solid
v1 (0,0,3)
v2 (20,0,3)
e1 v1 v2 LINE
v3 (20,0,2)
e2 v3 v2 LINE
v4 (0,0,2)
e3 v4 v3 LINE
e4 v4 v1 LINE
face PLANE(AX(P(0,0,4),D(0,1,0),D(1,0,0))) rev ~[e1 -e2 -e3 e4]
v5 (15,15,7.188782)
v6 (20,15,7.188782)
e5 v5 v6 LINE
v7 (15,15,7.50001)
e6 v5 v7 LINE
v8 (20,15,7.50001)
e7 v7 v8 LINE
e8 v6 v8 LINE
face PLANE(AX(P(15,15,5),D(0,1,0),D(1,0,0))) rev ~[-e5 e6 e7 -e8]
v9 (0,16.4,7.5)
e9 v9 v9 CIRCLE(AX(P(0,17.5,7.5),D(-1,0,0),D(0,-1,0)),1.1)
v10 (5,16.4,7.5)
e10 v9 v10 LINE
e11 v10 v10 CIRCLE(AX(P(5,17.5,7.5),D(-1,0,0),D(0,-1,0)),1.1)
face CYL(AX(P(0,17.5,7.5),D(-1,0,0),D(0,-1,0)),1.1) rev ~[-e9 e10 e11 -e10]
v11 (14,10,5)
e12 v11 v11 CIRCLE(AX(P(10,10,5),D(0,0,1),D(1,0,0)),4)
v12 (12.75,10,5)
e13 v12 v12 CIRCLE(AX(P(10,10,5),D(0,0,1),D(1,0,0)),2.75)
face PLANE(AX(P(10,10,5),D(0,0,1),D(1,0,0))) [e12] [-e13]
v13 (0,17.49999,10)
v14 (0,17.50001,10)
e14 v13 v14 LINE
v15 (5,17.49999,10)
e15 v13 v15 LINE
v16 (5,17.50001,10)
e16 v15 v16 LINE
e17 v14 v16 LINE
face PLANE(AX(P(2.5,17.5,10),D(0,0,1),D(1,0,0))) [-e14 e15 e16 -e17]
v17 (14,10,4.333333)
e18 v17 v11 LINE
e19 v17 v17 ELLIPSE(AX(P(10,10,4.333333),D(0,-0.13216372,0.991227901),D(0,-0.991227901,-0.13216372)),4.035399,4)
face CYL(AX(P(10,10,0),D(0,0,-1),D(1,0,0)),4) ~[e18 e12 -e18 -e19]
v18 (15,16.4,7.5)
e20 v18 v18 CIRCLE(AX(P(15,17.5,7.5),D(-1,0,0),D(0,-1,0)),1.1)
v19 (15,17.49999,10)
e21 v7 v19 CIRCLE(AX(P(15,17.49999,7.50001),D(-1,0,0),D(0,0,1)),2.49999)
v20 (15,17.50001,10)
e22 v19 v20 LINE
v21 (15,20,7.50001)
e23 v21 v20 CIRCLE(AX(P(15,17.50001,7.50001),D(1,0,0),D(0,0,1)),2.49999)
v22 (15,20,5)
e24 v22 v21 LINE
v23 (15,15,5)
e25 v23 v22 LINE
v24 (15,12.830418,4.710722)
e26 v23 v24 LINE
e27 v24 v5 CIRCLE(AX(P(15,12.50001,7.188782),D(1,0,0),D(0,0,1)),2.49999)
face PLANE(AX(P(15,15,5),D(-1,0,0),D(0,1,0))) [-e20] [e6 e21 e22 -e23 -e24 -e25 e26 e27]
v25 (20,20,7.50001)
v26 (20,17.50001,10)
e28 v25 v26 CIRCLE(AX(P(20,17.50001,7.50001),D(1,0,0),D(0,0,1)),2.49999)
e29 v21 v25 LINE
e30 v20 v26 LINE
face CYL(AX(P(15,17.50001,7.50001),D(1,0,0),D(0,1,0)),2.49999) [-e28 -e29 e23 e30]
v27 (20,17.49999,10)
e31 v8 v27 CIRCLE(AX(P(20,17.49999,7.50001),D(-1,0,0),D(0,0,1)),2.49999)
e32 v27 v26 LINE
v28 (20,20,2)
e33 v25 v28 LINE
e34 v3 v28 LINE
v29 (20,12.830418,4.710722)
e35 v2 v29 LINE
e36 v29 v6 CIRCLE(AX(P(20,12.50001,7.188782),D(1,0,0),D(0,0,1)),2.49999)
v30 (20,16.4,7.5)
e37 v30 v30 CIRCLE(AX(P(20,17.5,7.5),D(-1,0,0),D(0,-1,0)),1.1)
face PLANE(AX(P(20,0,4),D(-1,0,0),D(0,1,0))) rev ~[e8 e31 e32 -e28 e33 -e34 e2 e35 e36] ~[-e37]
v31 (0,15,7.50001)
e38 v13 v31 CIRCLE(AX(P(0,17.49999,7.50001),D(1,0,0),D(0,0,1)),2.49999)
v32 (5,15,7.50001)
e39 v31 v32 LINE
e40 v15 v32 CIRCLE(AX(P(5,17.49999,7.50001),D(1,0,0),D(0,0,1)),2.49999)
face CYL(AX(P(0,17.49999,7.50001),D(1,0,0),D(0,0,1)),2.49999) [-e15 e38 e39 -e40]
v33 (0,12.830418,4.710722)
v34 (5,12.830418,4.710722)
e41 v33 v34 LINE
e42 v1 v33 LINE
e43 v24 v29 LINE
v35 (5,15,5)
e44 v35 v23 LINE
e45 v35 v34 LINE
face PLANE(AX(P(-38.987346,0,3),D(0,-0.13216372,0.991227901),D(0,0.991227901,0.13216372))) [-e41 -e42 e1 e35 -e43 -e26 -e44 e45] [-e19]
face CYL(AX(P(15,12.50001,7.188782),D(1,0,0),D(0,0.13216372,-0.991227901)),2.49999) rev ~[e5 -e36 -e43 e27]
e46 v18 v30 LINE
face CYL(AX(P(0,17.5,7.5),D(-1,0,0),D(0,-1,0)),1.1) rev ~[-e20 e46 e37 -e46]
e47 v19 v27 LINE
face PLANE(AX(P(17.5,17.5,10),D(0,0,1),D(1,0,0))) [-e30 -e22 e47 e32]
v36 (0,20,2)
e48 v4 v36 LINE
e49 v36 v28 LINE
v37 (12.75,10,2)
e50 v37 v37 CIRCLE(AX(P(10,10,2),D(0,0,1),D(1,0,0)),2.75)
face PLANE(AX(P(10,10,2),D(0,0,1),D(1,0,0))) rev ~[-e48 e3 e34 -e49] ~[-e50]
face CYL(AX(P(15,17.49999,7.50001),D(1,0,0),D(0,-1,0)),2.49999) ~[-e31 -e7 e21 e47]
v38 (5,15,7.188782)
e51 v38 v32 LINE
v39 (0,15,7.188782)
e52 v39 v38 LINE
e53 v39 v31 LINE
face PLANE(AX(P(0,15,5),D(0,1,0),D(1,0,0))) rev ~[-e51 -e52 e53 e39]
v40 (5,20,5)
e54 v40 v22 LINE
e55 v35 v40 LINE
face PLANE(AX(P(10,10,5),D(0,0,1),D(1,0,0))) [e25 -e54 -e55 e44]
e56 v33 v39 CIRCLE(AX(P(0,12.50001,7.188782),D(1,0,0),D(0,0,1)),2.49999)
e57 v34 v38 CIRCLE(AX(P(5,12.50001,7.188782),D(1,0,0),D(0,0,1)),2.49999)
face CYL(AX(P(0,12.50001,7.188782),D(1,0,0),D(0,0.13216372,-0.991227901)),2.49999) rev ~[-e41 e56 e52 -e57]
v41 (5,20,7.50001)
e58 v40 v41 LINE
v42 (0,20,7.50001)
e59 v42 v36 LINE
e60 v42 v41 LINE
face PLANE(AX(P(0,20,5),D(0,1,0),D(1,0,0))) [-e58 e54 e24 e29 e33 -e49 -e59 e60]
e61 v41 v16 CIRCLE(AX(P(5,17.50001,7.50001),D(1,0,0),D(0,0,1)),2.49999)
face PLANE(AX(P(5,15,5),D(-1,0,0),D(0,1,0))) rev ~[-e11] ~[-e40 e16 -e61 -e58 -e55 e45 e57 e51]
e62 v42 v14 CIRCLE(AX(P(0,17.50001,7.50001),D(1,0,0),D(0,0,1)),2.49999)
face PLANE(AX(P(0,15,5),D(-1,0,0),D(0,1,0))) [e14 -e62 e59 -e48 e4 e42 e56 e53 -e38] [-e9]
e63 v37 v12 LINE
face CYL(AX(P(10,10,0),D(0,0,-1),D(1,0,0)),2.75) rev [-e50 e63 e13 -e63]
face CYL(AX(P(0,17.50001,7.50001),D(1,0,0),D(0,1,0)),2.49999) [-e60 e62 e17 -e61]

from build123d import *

# Parameters (mm, degrees)
F0_W        = 20
F0_H        = 20
F0_R        = 4
F1_DEPTH    = 4
F1_FACE_W   = 20
F1_FACE_H   = 20
F1_FACE_R   = 4
F0_R_2      = 2.75
F2_DEPTH    = 1
F3_W        = 5
F3_H        = 5
F4_DEPTH    = 5
F5_T1_DEPTH = 97.9746917615
F6_R        = 2.49999
F7_R        = 1.1
F8_DEPTH    = 25
F9_DEPTH    = 5
F10_DEPTH   = 2
F11_DEPTH   = 2


# Not quite as in the source:
# - a fillet or chamfer that OpenCascade refuses, or shapes differently, is made with other operations: its cross-section is extruded or revolved along the edge and cut away or added
# - a fillet or chamfer is up to 0.001 mm smaller than in the source, because OpenCascade refuses the exact size


with BuildPart() as f1:
    # F0 (on Top) → F1 (new body)
    with BuildSketch(Plane.XY):
        with Locations((10, 10)):
            Rectangle(F0_W, F0_H)
        with Locations((10, 10)):
            Circle(F0_R, mode=Mode.SUBTRACT)
    extrude(amount=F1_DEPTH)

    # F1_face (on face) + F0 (on Top) → F2 (join)
    with BuildSketch(Plane(origin=(10, 10, 4), x_dir=(1, 0, 0), z_dir=(0, 0, 1))):
        Rectangle(F1_FACE_W, F1_FACE_H)
        Circle(F1_FACE_R, mode=Mode.SUBTRACT)
    with BuildSketch(Plane.XY):
        with Locations((10, 10)):
            Circle(F0_R)
        with Locations((10, 10)):
            Circle(F0_R_2, mode=Mode.SUBTRACT)
    extrude(amount=F2_DEPTH)

    # F3 (on face) → F4 (join)
    with BuildSketch(Plane.XY.offset(5)):
        with Locations((2.5, 17.5)):
            Rectangle(F3_W, F3_H)
        with Locations((17.5, 17.5)):
            Rectangle(F3_W, F3_H)
    extrude(amount=F4_DEPTH)

    # F5: chamfer of 15 x 2 on 1 edges, made by hand

    # F5_s2 → F5_t1 (cut)
    with BuildSketch(Plane.YZ.offset(-38.9873458808)):
        Polygon((0, 3), (15, 5), (0, 5), align=None)
    extrude(amount=F5_T1_DEPTH, mode=Mode.SUBTRACT)

    # F6 (radius 2.5 in the source; OpenCascade refuses exactly that, so slightly less here)
    f6_edges = [f1.edges().sort_by_distance(p)[0] for p in [
        (2.5, 15, 5),
        (2.5, 15, 10),
        (17.5, 15, 5),
        (17.5, 15, 10),
        (2.5, 20, 10),
        (17.5, 20, 10),
    ]]
    fillet(f6_edges, radius=F6_R)

    # F7 (on face) → F8 (cut)
    with BuildSketch(Plane(origin=(0, 0, 0), x_dir=(0, -1, 0), z_dir=(-1, 0, 0))):
        with Locations((-17.5, 7.5)):
            Circle(F7_R)
    extrude(amount=-F8_DEPTH, mode=Mode.SUBTRACT)

    # F0 (on Top) → F9 (join)
    with BuildSketch(Plane.XY):
        with Locations((10, 10)):
            Circle(F0_R)
        with Locations((10, 10)):
            Circle(F0_R_2, mode=Mode.SUBTRACT)
    extrude(amount=F9_DEPTH)

    # F0 (on Top) → F10 (join)
    with BuildSketch(Plane.XY):
        with Locations((10, 10)):
            Circle(F0_R_2)
    extrude(amount=F10_DEPTH)

    # F0 (on Top) → F11 (cut)
    with BuildSketch(Plane.XY):
        with Locations((10, 10)):
            Rectangle(F0_W, F0_H)
        with Locations((10, 10)):
            Circle(F0_R, mode=Mode.SUBTRACT)
        with Locations((10, 10)):
            Circle(F0_R)
        with Locations((10, 10)):
            Circle(F0_R_2, mode=Mode.SUBTRACT)
        with Locations((10, 10)):
            Circle(F0_R_2)
    extrude(amount=F11_DEPTH, mode=Mode.SUBTRACT)


solid = f1.part
